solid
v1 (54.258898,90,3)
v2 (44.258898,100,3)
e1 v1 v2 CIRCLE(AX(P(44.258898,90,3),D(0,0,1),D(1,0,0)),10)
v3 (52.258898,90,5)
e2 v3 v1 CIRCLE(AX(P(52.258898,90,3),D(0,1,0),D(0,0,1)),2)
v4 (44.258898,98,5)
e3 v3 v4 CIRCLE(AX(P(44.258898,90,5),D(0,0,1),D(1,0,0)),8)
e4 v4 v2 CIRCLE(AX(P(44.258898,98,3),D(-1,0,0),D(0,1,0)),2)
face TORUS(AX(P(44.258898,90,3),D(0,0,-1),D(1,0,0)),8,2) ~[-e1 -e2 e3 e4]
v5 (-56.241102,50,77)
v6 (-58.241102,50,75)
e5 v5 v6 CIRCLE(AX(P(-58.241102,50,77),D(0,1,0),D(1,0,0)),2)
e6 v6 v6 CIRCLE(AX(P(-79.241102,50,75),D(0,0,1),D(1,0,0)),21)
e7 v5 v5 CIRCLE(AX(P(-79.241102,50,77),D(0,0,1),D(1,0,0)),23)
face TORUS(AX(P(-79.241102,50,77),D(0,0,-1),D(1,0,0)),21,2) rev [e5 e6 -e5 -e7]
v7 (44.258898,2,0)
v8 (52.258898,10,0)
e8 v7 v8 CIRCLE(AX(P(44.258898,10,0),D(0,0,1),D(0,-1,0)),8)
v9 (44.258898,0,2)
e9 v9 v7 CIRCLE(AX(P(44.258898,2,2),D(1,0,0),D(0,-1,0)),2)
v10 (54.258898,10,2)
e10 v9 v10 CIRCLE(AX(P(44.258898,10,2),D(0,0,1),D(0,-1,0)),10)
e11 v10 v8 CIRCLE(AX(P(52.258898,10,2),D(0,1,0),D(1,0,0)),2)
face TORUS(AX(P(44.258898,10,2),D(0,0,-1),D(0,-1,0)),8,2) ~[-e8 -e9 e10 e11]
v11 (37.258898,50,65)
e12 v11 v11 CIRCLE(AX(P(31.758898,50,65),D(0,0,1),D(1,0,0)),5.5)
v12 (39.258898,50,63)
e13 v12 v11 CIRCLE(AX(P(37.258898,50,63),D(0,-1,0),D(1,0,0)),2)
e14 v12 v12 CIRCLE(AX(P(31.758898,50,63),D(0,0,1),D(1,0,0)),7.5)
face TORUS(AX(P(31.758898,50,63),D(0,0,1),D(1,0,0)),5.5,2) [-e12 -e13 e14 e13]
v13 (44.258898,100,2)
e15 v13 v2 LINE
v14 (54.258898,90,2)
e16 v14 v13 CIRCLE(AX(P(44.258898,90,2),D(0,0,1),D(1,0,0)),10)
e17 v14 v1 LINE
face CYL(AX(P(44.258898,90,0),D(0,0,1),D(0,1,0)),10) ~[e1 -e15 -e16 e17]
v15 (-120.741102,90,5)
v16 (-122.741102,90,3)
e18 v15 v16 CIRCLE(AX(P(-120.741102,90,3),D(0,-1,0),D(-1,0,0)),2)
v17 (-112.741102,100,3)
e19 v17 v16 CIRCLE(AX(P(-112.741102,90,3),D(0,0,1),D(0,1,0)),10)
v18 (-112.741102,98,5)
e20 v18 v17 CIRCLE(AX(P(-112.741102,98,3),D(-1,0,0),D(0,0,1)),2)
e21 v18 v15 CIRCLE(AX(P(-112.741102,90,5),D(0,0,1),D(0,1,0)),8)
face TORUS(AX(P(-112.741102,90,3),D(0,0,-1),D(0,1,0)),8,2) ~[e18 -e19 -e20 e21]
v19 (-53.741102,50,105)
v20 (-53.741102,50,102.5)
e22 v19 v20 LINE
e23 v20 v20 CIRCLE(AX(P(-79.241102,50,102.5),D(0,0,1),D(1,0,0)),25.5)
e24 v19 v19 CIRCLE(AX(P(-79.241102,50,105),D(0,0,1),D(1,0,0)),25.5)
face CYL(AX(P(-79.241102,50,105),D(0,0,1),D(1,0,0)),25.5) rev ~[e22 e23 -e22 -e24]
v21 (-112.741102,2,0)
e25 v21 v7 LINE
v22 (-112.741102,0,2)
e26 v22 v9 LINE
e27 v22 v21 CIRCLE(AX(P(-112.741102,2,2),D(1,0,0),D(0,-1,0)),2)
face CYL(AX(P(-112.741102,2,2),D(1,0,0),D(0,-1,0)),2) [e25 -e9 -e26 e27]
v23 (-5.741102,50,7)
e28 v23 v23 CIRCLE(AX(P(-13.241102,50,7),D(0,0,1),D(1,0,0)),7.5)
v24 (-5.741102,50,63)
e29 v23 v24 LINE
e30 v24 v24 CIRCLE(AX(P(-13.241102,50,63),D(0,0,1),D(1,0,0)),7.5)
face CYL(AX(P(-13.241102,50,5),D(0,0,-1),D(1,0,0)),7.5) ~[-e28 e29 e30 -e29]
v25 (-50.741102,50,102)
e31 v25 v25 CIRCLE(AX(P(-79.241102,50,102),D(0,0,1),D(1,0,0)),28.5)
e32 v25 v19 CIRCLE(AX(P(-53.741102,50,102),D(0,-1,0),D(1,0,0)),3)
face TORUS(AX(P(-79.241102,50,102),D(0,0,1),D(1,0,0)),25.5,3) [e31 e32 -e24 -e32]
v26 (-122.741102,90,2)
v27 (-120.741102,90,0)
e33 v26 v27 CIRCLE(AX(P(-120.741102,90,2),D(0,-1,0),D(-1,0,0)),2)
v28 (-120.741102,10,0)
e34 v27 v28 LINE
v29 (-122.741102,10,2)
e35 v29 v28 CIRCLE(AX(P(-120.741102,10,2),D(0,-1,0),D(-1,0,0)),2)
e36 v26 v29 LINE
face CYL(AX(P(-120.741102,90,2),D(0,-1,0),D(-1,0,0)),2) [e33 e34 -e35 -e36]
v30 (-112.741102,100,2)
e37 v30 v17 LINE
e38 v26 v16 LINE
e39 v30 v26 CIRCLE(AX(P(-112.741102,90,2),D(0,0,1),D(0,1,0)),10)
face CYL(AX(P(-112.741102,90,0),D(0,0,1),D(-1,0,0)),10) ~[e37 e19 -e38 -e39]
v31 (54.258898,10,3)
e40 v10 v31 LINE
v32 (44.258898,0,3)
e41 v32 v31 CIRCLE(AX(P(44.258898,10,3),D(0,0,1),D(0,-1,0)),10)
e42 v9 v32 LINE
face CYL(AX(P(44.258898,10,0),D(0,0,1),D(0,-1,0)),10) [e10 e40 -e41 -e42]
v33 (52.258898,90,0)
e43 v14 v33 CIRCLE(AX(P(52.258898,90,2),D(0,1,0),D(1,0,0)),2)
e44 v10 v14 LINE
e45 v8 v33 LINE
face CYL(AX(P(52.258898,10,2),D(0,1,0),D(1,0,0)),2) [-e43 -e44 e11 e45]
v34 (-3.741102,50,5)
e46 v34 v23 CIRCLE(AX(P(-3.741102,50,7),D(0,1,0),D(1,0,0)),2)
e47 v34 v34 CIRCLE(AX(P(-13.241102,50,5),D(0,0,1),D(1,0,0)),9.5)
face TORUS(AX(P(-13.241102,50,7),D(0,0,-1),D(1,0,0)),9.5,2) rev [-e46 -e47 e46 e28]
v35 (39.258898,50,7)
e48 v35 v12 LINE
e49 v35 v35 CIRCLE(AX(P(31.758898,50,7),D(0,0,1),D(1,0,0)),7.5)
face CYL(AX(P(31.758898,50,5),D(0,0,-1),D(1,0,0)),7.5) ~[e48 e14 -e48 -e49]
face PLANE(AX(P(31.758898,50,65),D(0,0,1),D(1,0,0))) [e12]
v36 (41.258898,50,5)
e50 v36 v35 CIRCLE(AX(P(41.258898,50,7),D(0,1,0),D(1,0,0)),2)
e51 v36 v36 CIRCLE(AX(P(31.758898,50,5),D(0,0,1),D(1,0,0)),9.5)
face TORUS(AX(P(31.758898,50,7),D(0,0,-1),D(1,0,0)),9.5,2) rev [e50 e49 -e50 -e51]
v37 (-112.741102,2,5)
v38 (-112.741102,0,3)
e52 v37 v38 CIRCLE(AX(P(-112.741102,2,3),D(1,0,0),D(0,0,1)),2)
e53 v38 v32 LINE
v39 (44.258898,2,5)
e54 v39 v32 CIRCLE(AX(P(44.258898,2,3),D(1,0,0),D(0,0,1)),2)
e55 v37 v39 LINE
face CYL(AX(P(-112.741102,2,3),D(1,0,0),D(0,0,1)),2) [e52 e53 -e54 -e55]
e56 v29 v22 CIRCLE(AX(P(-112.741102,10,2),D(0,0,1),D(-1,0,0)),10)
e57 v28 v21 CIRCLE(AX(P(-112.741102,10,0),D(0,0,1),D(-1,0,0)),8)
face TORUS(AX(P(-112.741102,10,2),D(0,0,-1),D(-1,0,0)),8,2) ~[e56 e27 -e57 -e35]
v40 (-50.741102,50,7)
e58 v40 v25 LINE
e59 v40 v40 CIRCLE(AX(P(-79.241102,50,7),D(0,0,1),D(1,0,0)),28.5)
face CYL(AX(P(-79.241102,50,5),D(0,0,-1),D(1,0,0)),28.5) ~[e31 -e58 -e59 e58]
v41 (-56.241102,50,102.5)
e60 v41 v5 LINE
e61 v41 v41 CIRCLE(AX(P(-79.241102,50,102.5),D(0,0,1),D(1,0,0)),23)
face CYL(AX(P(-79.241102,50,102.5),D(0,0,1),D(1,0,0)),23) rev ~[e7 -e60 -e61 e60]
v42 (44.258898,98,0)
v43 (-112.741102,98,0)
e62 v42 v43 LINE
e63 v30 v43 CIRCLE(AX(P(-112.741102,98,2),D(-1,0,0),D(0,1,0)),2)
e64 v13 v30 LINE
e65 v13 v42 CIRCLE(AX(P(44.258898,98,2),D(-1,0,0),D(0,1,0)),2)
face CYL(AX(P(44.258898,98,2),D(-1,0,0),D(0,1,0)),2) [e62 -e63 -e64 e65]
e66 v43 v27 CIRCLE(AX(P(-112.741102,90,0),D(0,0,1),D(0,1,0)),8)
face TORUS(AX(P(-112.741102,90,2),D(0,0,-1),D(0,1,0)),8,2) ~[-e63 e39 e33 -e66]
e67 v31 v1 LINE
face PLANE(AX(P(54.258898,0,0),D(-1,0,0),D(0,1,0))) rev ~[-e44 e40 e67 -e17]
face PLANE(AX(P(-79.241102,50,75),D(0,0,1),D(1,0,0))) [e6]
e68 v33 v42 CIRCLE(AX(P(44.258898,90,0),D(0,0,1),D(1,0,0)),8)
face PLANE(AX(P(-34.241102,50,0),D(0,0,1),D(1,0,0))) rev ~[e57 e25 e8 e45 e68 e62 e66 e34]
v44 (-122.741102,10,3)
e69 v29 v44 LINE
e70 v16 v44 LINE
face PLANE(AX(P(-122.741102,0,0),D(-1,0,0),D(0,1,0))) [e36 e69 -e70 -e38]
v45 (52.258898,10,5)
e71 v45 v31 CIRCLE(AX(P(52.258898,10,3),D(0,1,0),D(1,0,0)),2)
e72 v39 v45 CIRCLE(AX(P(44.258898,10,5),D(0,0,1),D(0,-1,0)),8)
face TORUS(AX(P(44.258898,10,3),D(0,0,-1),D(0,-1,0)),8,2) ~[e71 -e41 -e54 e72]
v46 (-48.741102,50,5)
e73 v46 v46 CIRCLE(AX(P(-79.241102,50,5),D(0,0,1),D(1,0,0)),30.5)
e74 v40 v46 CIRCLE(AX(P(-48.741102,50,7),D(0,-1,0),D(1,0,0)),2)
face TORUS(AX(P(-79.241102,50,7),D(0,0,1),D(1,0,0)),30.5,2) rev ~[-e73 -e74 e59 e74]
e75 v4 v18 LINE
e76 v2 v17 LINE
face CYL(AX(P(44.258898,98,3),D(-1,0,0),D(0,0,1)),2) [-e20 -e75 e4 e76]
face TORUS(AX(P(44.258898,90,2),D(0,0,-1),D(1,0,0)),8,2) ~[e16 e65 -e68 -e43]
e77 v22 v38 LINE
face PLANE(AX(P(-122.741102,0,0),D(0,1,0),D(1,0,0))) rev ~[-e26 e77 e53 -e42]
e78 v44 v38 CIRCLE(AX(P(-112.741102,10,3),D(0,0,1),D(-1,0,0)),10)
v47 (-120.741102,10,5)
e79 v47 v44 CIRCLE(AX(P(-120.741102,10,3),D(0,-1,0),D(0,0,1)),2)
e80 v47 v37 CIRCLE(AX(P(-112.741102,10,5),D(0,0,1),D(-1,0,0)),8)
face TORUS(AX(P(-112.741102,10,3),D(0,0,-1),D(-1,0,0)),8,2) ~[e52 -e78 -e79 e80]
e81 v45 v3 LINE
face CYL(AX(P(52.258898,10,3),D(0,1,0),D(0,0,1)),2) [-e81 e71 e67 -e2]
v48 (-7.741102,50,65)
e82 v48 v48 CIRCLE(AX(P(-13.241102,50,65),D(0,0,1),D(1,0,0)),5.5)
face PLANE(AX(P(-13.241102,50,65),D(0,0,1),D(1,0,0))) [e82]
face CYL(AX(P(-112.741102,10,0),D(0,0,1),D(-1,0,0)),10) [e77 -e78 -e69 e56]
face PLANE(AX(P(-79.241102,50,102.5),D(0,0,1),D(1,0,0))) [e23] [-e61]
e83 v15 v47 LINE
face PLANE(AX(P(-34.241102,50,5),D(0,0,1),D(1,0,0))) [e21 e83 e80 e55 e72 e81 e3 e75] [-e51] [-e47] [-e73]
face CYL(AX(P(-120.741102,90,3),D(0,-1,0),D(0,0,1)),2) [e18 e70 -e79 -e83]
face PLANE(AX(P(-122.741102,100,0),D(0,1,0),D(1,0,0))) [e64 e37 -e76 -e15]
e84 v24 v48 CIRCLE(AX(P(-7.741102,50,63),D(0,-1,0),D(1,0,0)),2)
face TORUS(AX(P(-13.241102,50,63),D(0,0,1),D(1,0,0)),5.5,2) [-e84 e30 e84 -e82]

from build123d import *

# Parameters (mm, degrees)
F0_W     = 177
F0_H     = 100
F1_DEPTH = 5
F2_R     = 28.5
F3_DEPTH = 100
F4_R     = 10
F5_R     = 3
F6_DEPTH = 2.5
F7_R     = 23
F8_DEPTH = 27.5
F2_R_2   = 7.5
F9_DEPTH = 60
F10_R    = 2


# Not quite as in the source:
# - a feature names something its author has since deleted; it is built from what else it names


with BuildPart() as f1:
    # F0 (on Top) → F1 (new body)
    with BuildSketch(Plane.XY):
        with Locations((-34.2411024152, 50)):
            Rectangle(F0_W, F0_H)
    extrude(amount=F1_DEPTH)

    # F2 (on face) → F3 (join)
    with BuildSketch(Plane.XY.offset(5)):
        with Locations((-79.2411024152, 50)):
            Circle(F2_R)
    extrude(amount=F3_DEPTH)

    # F4
    f4_edges = [f1.edges().sort_by_distance(p)[0] for p in [
        (-122.741102, 0, 2.5),
        (54.258898, 0, 2.5),
        (-122.741102, 100, 2.5),
        (54.258898, 100, 2.5),
    ]]
    fillet(f4_edges, radius=F4_R)

    # F5
    f5_edges = [f1.edges().sort_by_distance(p)[0] for p in [
        (-107.741102, 50, 105),
    ]]
    fillet(f5_edges, radius=F5_R)

    # F6 (cut): a face of the model
    f6_faces = [f1.faces().sort_by_distance(p)[0] for p in [
        (-79.2411024152, 50, 105),
    ]]
    extrude(f6_faces, amount=-F6_DEPTH, mode=Mode.SUBTRACT)

    # F7 (on face) → F8 (cut)
    with BuildSketch(Plane.XY.offset(102.5)):
        with Locations((-79.2411024152, 50)):
            Circle(F7_R)
    extrude(amount=-F8_DEPTH, mode=Mode.SUBTRACT)

    # F2 (on face) → F9 (join)
    with BuildSketch(Plane.XY.offset(5)):
        with Locations((31.7588975848, 50)):
            Circle(F2_R_2)
        with Locations((-13.2411024152, 50)):
            Circle(F2_R_2)
    extrude(amount=F9_DEPTH)

    # F10
    f10_edges = [f1.edges().sort_by_distance(p)[0] for p in [
        (-34.241102, 0, 5),
        (-119.81217, 2.928932, 5),
        (51.329965, 2.928932, 5),
        (-122.741102, 50, 5),
        (54.258898, 50, 5),
        (-119.81217, 97.071068, 5),
        (51.329965, 97.071068, 5),
        (-34.241102, 100, 5),
        (-107.741102, 50, 5),
        (-20.741102, 50, 5),
        (24.258898, 50, 5),
        (-34.241102, 0, 0),
        (-119.81217, 2.928932, 0),
        (51.329965, 2.928932, 0),
        (-122.741102, 50, 0),
        (54.258898, 50, 0),
        (-119.81217, 97.071068, 0),
        (51.329965, 97.071068, 0),
        (-34.241102, 100, 0),
        (-102.241102, 50, 75),
        (24.258898, 50, 65),
        (-20.741102, 50, 65),
    ]]
    fillet(f10_edges, radius=F10_R)


solid = f1.part
